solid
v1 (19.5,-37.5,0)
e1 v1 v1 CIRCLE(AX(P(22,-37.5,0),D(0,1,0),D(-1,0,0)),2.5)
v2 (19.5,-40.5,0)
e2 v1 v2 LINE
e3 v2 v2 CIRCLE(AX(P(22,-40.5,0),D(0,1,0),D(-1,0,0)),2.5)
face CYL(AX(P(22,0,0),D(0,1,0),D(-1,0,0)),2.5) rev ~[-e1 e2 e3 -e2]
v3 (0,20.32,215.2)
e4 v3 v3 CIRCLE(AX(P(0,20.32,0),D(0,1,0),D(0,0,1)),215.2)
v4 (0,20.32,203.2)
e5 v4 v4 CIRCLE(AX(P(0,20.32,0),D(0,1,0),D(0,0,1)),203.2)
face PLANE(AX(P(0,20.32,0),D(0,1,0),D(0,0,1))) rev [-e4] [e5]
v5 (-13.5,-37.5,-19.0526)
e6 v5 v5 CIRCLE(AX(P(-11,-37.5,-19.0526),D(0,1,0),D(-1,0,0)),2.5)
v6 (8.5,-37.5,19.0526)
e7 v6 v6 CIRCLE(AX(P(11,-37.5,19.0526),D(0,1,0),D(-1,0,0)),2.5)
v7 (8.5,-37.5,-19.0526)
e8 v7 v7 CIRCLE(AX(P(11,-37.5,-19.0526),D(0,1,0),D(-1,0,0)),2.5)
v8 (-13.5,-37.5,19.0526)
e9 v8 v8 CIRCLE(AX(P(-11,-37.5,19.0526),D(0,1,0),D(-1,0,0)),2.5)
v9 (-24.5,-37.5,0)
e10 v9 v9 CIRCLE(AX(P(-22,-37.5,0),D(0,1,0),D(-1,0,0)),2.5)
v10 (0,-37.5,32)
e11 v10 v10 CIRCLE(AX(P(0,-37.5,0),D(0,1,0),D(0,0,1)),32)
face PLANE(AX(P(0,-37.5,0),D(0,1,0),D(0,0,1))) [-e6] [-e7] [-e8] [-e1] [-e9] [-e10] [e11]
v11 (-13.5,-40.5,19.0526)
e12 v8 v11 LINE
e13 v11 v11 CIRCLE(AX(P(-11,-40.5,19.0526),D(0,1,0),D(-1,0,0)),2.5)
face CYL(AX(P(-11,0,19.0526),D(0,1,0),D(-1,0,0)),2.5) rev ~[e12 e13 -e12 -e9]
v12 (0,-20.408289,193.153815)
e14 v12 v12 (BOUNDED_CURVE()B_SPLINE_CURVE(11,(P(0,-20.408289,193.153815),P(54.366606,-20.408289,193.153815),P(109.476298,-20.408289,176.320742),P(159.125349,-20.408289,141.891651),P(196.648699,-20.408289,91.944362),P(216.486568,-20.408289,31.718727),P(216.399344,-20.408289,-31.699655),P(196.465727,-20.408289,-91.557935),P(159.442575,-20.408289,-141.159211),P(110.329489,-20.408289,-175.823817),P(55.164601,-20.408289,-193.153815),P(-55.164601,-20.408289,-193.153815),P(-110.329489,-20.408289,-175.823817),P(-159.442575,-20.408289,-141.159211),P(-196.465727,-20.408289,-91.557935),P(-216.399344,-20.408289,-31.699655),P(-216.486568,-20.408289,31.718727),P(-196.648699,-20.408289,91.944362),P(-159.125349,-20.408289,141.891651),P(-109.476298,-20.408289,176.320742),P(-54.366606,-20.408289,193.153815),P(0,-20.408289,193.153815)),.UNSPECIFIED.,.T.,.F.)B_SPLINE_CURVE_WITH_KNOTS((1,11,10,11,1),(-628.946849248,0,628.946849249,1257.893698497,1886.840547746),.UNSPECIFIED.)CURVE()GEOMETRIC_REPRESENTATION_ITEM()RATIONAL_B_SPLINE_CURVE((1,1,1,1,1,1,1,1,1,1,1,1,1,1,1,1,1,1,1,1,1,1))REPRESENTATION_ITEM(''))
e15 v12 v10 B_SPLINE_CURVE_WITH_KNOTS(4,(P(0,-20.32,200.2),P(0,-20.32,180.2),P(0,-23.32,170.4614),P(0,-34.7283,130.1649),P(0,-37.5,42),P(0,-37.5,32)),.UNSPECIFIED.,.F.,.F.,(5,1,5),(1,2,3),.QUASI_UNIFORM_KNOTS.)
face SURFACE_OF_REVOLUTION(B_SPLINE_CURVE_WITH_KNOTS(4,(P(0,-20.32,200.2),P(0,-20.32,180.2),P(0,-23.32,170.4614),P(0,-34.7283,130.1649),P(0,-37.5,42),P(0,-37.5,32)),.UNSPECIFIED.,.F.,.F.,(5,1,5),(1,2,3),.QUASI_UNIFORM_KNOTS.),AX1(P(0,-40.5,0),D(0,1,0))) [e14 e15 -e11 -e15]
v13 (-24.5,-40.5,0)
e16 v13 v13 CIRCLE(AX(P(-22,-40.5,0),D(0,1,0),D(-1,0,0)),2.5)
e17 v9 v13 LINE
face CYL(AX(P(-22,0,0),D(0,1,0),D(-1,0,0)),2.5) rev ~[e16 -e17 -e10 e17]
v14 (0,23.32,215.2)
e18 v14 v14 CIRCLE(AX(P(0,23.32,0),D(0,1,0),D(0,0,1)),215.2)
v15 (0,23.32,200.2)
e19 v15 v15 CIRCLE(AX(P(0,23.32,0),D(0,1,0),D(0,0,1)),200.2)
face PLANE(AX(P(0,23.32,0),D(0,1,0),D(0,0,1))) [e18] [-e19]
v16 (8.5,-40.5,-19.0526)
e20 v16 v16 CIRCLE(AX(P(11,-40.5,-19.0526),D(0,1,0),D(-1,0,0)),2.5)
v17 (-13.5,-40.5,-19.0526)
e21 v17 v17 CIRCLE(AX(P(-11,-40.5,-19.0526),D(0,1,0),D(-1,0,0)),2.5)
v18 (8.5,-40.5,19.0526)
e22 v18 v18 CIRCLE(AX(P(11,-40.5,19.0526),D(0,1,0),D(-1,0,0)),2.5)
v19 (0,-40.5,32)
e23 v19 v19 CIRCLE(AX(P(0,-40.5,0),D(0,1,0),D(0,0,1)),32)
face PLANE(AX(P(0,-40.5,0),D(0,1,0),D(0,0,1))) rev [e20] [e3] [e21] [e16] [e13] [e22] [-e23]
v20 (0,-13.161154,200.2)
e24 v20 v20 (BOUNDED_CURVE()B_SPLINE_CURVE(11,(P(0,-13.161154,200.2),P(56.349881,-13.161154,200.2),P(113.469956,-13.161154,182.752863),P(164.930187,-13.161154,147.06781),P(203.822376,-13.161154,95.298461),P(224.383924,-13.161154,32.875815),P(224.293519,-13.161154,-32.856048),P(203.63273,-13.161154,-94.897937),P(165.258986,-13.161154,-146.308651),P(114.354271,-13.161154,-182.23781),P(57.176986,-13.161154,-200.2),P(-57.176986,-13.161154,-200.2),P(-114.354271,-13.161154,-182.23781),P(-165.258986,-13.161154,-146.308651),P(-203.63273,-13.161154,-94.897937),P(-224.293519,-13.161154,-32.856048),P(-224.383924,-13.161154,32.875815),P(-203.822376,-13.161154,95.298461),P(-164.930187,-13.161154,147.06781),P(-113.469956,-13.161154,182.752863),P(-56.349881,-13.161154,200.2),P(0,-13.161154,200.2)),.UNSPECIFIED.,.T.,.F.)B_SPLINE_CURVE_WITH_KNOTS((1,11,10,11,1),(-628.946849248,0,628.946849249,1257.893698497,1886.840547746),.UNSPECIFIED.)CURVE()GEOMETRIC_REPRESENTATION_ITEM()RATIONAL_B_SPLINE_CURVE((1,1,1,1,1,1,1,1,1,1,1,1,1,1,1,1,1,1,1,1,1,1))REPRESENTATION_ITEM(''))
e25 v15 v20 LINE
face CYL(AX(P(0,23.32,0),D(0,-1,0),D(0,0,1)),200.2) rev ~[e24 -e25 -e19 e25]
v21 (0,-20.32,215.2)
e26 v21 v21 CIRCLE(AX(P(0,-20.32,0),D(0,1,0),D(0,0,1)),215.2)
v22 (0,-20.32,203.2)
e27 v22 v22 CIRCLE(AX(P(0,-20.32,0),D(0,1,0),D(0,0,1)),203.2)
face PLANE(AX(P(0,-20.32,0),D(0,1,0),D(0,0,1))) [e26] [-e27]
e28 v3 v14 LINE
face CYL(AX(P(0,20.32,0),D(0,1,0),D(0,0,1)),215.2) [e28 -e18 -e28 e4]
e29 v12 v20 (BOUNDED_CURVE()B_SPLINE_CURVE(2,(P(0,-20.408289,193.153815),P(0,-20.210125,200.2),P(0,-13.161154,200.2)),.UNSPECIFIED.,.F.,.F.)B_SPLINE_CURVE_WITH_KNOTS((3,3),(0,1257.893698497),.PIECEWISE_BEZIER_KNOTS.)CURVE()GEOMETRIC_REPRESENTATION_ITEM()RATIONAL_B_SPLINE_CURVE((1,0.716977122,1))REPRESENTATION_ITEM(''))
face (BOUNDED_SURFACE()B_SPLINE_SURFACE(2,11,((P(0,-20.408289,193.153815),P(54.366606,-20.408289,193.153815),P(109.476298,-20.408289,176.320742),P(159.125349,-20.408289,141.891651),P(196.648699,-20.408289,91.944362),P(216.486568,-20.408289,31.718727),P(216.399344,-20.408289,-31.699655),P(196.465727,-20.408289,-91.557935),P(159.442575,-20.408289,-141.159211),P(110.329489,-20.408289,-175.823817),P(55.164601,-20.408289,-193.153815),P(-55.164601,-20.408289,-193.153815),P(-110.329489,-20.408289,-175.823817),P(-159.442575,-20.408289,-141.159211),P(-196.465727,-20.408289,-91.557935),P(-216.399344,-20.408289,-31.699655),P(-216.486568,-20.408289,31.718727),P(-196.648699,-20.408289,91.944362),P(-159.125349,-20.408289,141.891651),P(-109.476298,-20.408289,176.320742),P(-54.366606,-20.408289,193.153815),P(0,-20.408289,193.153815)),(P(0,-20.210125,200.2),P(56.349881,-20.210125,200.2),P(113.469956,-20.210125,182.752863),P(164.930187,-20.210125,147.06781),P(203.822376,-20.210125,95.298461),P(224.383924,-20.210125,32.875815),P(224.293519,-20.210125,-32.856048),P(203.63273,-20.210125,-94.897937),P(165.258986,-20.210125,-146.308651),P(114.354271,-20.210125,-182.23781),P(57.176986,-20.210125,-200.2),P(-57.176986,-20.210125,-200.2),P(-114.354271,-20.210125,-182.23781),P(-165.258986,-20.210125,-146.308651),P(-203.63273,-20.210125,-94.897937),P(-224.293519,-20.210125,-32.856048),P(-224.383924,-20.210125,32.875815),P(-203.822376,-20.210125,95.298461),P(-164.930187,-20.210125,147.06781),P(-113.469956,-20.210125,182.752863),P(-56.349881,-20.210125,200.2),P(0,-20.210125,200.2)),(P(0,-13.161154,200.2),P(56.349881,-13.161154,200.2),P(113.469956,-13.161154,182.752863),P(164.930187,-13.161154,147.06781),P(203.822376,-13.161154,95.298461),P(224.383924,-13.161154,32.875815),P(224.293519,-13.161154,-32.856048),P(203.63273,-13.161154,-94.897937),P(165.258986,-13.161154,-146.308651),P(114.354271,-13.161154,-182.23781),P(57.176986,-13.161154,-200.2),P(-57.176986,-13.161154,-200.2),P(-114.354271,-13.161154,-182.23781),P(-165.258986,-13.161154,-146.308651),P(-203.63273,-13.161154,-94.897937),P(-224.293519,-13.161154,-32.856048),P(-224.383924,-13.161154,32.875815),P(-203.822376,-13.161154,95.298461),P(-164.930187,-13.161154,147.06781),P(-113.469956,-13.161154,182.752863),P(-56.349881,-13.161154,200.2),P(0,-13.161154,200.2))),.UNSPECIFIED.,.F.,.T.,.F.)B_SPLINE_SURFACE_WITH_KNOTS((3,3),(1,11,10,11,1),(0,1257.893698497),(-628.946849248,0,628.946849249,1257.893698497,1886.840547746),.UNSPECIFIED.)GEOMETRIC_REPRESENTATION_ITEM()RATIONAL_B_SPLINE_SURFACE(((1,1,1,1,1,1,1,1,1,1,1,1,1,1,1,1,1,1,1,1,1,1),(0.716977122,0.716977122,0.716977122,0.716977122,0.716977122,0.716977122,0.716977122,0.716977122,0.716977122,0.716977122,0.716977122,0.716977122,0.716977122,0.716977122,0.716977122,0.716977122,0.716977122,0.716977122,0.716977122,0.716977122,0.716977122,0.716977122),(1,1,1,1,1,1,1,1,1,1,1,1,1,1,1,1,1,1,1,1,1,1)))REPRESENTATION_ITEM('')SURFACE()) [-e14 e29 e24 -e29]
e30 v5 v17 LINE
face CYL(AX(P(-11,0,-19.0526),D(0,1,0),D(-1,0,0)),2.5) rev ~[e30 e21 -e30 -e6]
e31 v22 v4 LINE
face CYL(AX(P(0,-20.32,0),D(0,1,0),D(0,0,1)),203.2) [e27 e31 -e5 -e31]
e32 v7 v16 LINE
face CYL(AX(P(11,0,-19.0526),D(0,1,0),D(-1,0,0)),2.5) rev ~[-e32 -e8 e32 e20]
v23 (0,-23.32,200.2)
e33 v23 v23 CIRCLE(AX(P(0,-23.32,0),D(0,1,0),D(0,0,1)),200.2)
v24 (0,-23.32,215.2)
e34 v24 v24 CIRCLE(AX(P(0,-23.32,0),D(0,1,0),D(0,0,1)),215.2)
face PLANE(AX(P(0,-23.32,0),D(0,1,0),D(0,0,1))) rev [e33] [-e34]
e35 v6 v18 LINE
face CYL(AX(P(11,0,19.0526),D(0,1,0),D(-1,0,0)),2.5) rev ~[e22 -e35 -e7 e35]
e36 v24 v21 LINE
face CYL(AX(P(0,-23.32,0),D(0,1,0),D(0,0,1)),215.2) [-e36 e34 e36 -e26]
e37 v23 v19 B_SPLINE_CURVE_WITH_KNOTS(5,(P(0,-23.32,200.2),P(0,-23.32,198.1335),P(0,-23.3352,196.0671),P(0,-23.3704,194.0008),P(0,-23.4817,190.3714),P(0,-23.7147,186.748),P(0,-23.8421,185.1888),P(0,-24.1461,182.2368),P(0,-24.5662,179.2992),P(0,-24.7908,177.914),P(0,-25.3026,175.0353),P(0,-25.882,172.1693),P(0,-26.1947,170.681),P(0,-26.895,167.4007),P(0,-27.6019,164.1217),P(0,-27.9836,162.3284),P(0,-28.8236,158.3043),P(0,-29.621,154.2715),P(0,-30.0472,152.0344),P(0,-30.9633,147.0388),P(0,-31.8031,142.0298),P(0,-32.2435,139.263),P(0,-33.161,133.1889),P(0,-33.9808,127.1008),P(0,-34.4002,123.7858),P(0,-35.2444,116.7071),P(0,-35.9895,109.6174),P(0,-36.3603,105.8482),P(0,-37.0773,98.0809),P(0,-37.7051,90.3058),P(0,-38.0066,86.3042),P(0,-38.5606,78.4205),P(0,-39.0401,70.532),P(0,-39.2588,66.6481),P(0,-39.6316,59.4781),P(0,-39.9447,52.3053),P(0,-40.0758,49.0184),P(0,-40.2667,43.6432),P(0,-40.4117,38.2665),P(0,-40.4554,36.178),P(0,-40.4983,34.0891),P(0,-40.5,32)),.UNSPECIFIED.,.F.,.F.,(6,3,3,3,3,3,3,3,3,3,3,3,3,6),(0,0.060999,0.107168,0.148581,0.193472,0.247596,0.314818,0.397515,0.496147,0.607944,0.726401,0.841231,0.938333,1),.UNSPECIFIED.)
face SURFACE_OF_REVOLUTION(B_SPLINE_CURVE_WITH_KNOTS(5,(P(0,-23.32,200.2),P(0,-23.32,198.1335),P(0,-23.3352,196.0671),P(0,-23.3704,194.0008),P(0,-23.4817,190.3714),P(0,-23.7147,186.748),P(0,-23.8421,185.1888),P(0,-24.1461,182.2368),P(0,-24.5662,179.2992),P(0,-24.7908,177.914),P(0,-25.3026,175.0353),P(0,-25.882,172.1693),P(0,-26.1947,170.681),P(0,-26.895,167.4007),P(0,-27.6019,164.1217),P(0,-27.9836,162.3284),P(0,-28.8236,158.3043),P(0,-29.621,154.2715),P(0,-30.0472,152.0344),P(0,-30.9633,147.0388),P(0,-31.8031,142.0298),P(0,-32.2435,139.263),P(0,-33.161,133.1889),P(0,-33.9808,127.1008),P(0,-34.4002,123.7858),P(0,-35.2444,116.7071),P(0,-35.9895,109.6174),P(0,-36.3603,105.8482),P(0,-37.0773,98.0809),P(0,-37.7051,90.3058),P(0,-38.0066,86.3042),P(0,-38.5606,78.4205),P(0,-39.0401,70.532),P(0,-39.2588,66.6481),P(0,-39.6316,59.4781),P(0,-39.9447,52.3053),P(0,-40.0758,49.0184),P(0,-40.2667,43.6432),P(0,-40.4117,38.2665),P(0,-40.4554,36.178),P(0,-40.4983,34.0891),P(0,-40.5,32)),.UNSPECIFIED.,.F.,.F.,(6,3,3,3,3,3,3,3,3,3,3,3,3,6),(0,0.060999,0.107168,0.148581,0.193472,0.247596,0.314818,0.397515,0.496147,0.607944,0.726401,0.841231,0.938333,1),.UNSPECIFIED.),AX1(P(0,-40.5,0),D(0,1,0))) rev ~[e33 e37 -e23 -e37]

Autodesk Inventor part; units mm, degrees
ref_plane "YZ Plane" through (0, 0, 0) normal (1, 0, 0) x (0, 1, 0)
ref_plane "XZ Plane" through (0, 0, 0) normal (0, 1, 0) x (-1, 0, 0)
ref_plane "XY Plane" through (0, 0, 0) normal (0, 0, 1) x (1, 0, 0)
sketch "Esquisse1" plane through (0, 0, 0) normal (1, 0, 0) x (0, 1, 0)
  line L0 (0, -56) -> (0, 56)
  line L1 (-49.4, 0) -> (30.4, 0)
  line L2 (-37.5, 32) -> (-37.5, 0)
  line L3 (23.32, 200.2) -> (-20.32, 200.2)
  line L4 (-40.5, 0) -> (-40.5, 32)
  line L5 (-37.5, 0) -> (-40.5, 0)
  line L6 (-40.5, 0) -> (-37.5, 0)
  line L7 (-37.5, 32) -> (-40.5, 32) construction
  line L8 (-37.5, -30) -> (-37.5, 30) projected
  line L9 (-17.32, -203.2) -> (-17.32, 203.2) construction
  line L10 (-20.32, -203.2) -> (-20.32, 203.2) construction
  line L11 (18.32, 203.2) -> (18.32, -203.2) construction
  line L12 (17.32, -203.2) -> (17.32, 203.2) construction
  line L13 (20.32, -203.2) -> (20.32, 203.2) construction
  line L14 (20.32, 215.2) -> (23.32, 215.2)
  line L15 (23.32, 215.2) -> (23.32, 200.2)
  line L16 (-23.32, 200.2) -> (-23.32, 215.2)
  line L17 (-23.32, 215.2) -> (-20.32, 215.2)
  line L18 (-20.32, 215.2) -> (-20.32, 203.2)
  line L19 (-20.32, 203.2) -> (20.32, 203.2)
  line L20 (20.32, 203.2) -> (20.32, 215.2)
  line L21 (-20.32, 200.2) -> (-23.32, 200.2) construction
  line L22 (20.32, 203.2) -> (20.32, 200.2) construction
  line L23 (-20.32, 200.2) -> (-20.32, 180.2) construction
  line L24 (-20.32, 180.2) -> (-23.32, 170.4614) construction
  line L25 (-23.32, 170.4614) -> (-34.7283, 130.1649) construction
  line L26 (-34.7283, 130.1649) -> (-37.5, 42) construction
  line L27 (-37.5, 42) -> (-37.5, 32) construction
  spline S0 degree 4 poles (-20.32, 200.2) (-20.32, 180.2) (-23.32, 170.4614) (-34.7283, 130.1649) (-37.5, 42) (-37.5, 32) knots 1 1 1 1 1 2 3 3 3 3 3
  spline S1 degree 5 poles (-23.32, 200.2) (-23.32, 198.1335) (-23.3352, 196.0671) (-23.3704, 194.0008) (-23.4817, 190.3714) (-23.7147, 186.748) (-23.8421, 185.1888) (-24.1461, 182.2368) (-24.5662, 179.2992) (-24.7908, 177.914) (-25.3026, 175.0353) (-25.882, 172.1693) (-26.1947, 170.681) (-26.895, 167.4007) (-27.6019, 164.1217) (-27.9836, 162.3284) (-28.8236, 158.3043) (-29.621, 154.2715) (-30.0472, 152.0344) (-30.9633, 147.0388) (-31.8031, 142.0298) (-32.2435, 139.263) (-33.161, 133.1889) (-33.9808, 127.1008) (-34.4002, 123.7858) (-35.2444, 116.7071) (-35.9895, 109.6174) (-36.3603, 105.8482) (-37.0773, 98.0809) (-37.7051, 90.3058) (-38.0066, 86.3042) (-38.5606, 78.4205) (-39.0401, 70.532) (-39.2588, 66.6481) (-39.6316, 59.4781) (-39.9447, 52.3053) (-40.0758, 49.0184) (-40.2667, 43.6432) (-40.4117, 38.2665) (-40.4554, 36.178) (-40.4983, 34.0891) (-40.5, 32) knots 0 0 0 0 0 0 0.060999 0.060999 0.060999 0.107168 0.107168 0.107168 0.148581 0.148581 0.148581 0.193472 0.193472 0.193472 0.247596 0.247596 0.247596 0.314818 0.314818 0.314818 0.397515 0.397515 0.397515 0.496147 0.496147 0.496147 0.607944 0.607944 0.607944 0.726401 0.726401 0.726401 0.841231 0.841231 0.841231 0.938333 0.938333 0.938333 1 1 1 1 1 1
  point P0 (0, 0)
  point P1 (-20.32, 200.2)
  dimension "d9" = 3
  dimension "d16" = 203.2
  dimension "d17" = 12
  dimension "d19" = 32
  dimension "d21" = 20
  dimension "d22" = 10
revolve "Révolution1" add sketch "Esquisse1" angle 360 about axis through (0, -49.4, 0) along (0, 1, 0)
sketch "Esquisse2" plane through (0, 0, 0) normal (0, 1, 0) x (-1, 0, 0)
  circle A0 centre (11, 19.0526) radius 2.5
  circle A1 centre (-11, 19.0526) radius 2.5
  circle A2 centre (-22, 0) radius 2.5
  circle A3 centre (-11, -19.0526) radius 2.5
  circle A4 centre (11, -19.0526) radius 2.5
  circle A5 centre (22, 0) radius 2.5
  circle A6 centre (-11, -19.0526) radius 2.5
  circle A7 centre (11, -19.0526) radius 2.5
  circle A8 centre (22, 0) radius 2.5
  circle A9 centre (11, 19.0526) radius 2.5
  circle A10 centre (-11, 19.0526) radius 2.5
  circle A11 centre (-22, 0) radius 2.5
  circle A12 centre (0, 0) radius 30
  circle A13 centre (0, 0) radius 13
  point P0 (0, 0)
extrude "Extrusion1" cut sketch "Esquisse2" against normal through all contours A0 | A1 | A2 | A3 | A4 | A5
fillet "Congé1" [suppressed]
fillet "Congé3" radius 7.25 1 edges at (0, -20.32, -200.2)
equation "\"d_profile_section\" = 40"
equation "\"d_prfc_thickness\" = 3"
equation "\"d_arm_in_diameter\" = 27"
equation "\"d_arm_out_diameter\" = 30"
equation "\"d_arm_length\" = 250"
equation "\"d_suspension_height\" = 140"
equation "\"d_aluminum_thickness\" = 3.175"
equation "\"d_suspension_box_width\" = 40"
equation "\"d_wheelbase\" = 1600"
equation "\"a_tilt\" = 10deg"
equation "\"d_rear_profile_height\" = 101.6"
equation "\"d_rear_profile_width\" = 50.8"
equation "\"d_central_profile_width\" = 50.8"
equation "\"d_central_profile_height\" = 101.6"
equation "\"d_handle_bar_tube_diameter\" = 35"
equation "\"a_direction_column\" = 35deg"
equation "\"prfc_tube_id\" = 33"
equation "\"prfc_tube_od\" = 35"
equation "\"front_suspension_height\" = 140.92977"
equation "\"front_suspension_width\" = 150"
equation "\"caster_angle\" = 24deg"
equation "\"a_caster_angle\" = 25deg"
equation "\"d_handlebar_pivot_offset\" = 65"
equation "\"d_handlebar_arm_length\" = 80"
equation "\"a_handlebar_angle\" = 60deg"
equation "\"d_left_to_right_front_pivots\" = 28"
equation "\"d_front_arm_id\" = 29.2608"
equation "\"d_front_arm_od\" = 31.75"
equation "\"d_aluminum_bar_thickness\" = 12.7"
equation "\"d_handle_bar_id\" = 30"
equation "\"d_handle_bar_od\" = 38.1"
equation "\"d_steering_arm_length\" = 70"
equation "\"d_steering_height_from_hub_center\" = 28"
equation "\"d_steering_height_from_hub_carrier_center\" = 18"
equation "\"d_central_beam_inclination\" = 12"
equation "\"a_central_beam_inclination\" = 12deg"
equation "\"d_central_beam_screws_diameter\" = 8"
equation "\"d_rear_profile_wall_thickness\" = 4.7625"
equation "\"d_rear_profile_wall_thickness_1\" = 4.7625"
equation "\"d_central_pivot_screw_diameter\" = 15.875"
properties part number "wheel_rim" material "CFRP"
